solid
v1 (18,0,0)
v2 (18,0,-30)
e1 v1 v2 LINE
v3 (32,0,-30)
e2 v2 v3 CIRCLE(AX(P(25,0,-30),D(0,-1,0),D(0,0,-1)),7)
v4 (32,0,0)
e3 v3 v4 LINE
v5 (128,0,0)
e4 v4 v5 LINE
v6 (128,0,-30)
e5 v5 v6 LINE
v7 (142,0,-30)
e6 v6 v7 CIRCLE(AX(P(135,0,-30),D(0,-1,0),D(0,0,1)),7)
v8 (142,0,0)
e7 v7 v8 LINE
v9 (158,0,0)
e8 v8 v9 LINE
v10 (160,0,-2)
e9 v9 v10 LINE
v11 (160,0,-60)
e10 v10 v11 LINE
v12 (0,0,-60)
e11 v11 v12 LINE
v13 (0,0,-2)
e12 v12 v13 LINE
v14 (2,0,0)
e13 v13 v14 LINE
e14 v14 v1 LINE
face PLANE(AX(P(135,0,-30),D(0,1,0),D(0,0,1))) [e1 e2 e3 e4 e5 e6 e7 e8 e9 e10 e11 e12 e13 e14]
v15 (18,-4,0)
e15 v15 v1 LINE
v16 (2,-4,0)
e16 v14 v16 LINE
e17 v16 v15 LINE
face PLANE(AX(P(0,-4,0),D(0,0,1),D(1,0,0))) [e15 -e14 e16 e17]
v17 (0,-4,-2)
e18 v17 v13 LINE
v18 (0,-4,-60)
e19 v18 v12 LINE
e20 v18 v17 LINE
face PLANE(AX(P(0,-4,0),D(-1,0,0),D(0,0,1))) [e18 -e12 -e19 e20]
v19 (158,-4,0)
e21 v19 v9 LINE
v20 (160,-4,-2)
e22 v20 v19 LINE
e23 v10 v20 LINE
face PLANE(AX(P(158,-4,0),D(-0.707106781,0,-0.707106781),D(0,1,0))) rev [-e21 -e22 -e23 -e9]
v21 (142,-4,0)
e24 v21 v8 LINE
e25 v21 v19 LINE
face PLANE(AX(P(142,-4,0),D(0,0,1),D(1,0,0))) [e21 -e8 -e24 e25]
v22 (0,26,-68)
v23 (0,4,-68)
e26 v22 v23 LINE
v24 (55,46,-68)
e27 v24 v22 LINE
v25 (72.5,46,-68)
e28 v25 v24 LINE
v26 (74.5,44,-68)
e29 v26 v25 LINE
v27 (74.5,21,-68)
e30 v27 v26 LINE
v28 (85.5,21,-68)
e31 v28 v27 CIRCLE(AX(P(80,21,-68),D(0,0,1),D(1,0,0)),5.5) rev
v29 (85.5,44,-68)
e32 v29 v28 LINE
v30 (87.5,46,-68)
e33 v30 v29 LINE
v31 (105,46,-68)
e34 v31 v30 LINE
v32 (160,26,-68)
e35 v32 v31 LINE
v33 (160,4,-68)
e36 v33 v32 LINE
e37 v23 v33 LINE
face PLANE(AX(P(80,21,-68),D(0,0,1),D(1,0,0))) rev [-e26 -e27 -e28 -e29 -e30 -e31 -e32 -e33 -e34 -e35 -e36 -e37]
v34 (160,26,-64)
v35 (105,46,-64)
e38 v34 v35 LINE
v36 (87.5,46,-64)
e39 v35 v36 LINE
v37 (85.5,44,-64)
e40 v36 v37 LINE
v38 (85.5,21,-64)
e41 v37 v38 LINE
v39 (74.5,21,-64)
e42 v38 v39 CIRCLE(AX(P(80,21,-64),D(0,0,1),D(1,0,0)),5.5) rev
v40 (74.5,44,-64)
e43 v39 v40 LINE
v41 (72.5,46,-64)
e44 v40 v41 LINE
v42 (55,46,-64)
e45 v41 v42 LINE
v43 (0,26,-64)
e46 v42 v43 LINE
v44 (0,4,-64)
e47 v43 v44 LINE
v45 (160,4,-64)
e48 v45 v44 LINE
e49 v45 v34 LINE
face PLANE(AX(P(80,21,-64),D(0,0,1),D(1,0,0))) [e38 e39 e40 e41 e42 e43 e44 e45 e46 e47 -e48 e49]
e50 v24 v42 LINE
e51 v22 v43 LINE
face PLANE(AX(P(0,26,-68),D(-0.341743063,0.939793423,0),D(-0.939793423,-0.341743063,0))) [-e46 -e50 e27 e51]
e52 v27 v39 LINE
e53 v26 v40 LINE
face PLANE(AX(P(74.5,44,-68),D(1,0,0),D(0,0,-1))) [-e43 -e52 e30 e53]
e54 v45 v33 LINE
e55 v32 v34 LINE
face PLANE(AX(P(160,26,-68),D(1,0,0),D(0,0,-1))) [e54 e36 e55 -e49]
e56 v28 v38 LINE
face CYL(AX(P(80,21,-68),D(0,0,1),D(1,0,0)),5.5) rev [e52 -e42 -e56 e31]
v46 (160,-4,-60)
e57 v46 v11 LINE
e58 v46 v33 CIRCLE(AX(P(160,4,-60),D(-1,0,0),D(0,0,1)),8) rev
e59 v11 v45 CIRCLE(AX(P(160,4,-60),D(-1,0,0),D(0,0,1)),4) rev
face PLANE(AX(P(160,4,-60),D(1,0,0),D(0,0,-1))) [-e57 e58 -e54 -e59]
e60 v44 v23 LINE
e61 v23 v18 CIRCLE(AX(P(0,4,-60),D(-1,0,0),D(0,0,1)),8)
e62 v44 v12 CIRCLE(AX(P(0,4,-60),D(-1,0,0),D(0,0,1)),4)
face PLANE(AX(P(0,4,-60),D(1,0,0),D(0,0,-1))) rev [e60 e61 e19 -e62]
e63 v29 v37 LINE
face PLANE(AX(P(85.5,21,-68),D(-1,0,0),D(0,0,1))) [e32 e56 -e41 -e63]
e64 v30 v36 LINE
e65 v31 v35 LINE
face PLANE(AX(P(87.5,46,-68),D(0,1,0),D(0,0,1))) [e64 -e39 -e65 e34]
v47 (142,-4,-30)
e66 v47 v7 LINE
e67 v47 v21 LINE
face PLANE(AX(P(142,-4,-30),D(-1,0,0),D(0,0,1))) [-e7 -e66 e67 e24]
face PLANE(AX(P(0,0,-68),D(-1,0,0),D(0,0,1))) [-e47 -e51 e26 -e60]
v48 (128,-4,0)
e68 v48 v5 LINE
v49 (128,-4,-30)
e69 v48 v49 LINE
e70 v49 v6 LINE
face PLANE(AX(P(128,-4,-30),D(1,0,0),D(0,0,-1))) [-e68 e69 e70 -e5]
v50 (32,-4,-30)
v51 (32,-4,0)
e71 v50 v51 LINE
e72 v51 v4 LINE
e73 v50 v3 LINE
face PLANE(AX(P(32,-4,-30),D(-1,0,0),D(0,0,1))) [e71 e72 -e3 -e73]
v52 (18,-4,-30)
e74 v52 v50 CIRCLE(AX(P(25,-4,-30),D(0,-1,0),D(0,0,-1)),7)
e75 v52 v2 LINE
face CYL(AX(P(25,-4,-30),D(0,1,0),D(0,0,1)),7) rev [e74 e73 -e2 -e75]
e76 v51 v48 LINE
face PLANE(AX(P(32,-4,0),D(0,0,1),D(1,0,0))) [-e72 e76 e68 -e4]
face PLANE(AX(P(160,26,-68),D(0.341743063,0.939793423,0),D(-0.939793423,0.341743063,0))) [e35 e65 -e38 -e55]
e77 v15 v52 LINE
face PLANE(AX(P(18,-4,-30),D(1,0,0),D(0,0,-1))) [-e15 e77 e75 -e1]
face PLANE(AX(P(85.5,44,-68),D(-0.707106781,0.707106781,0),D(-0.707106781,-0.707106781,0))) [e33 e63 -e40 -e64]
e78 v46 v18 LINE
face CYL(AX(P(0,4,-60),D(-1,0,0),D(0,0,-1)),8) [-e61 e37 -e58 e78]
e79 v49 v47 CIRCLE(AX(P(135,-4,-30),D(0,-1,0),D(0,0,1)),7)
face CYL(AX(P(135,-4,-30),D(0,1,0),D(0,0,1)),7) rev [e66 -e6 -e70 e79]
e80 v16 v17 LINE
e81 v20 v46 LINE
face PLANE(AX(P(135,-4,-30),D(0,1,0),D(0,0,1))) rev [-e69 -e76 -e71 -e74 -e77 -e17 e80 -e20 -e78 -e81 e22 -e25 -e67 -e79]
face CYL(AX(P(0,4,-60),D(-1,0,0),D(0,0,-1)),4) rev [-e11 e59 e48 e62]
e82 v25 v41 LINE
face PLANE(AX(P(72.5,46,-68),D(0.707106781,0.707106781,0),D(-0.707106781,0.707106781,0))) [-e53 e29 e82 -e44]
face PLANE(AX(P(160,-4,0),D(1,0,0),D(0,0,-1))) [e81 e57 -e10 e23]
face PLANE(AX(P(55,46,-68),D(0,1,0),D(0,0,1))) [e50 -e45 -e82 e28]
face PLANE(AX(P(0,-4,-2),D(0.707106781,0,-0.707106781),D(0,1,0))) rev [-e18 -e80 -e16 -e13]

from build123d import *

# Parameters (mm, degrees)
BASE_FLANGE1_DEPTH      = 4
EDGE_FLANGE1_DEPTH      = 160
EDGE_FLANGE1_START      = -4
EDGE_FLANGE1_FLAT_DEPTH = 4
CHAMFER1_SIZE           = 2


# Sheet-metal steps are written as plain solids
with BuildPart() as part:
    # Sketch1 → Base-Flange1 (new body)
    with BuildSketch(Plane(origin=(0, 0, 0), x_dir=(1, 0, 0), z_dir=(0, 1, 0))):
        with BuildLine():
            Line((0, 0), (18, 0))
            Line((18, 0), (18, 30))
            ThreePointArc((18, 30), (25, 37), (32, 30))
            Line((32, 30), (32, 0))
            Line((32, 0), (128, 0))
            Line((128, 0), (128, 30))
            ThreePointArc((128, 30), (135, 37), (142, 30))
            Line((142, 30), (142, 0))
            Line((142, 0), (160, 0))
            Line((160, 0), (160, 60))
            Line((160, 60), (0, 60))
            Line((0, 60), (0, 0))
        make_face()
    extrude(amount=-BASE_FLANGE1_DEPTH)

    # Edge-Flange1 bend section (across the edge) → Edge-Flange1 (add)
    with BuildSketch(Plane(origin=(160, 0, -64), x_dir=(0, 0, 1), z_dir=(-1, 0, 0))):
        with BuildLine():
            Line((-4, 4), (0, 4))
            ThreePointArc((0, 4), (1.171572875, 1.171572875), (4, 0))
            Line((4, 0), (4, -4))
            ThreePointArc((4, -4), (-1.656854249, -1.656854249), (-4, 4))
        make_face()
    extrude(amount=EDGE_FLANGE1_DEPTH)

    # Edge-Flange1 profile (on flange) → Edge-Flange1 flat (add)
    with BuildSketch(Plane.XY.offset(-64).offset(EDGE_FLANGE1_START)):
        with BuildLine():
            Line((0, 4), (160, 4))
            Line((160, 4), (160, 26))
            Line((160, 26), (105, 46))
            Line((105, 46), (87.5, 46))
            Line((87.5, 46), (85.5, 44))
            Line((85.5, 44), (85.5, 21))
            ThreePointArc((85.5, 21), (80, 15.5), (74.5, 21))
            Line((74.5, 21), (74.5, 44))
            Line((74.5, 44), (72.5, 46))
            Line((72.5, 46), (55, 46))
            Line((55, 46), (0, 26))
            Line((0, 26), (0, 4))
        make_face()
    extrude(amount=EDGE_FLANGE1_FLAT_DEPTH)

    # Chamfer1
    chamfer1_edges = [part.edges().sort_by_distance(p)[0] for p in [
        (160, -2, 0),
        (0, -2, 0),
    ]]
    chamfer(chamfer1_edges, length=CHAMFER1_SIZE)


solid = part.part
